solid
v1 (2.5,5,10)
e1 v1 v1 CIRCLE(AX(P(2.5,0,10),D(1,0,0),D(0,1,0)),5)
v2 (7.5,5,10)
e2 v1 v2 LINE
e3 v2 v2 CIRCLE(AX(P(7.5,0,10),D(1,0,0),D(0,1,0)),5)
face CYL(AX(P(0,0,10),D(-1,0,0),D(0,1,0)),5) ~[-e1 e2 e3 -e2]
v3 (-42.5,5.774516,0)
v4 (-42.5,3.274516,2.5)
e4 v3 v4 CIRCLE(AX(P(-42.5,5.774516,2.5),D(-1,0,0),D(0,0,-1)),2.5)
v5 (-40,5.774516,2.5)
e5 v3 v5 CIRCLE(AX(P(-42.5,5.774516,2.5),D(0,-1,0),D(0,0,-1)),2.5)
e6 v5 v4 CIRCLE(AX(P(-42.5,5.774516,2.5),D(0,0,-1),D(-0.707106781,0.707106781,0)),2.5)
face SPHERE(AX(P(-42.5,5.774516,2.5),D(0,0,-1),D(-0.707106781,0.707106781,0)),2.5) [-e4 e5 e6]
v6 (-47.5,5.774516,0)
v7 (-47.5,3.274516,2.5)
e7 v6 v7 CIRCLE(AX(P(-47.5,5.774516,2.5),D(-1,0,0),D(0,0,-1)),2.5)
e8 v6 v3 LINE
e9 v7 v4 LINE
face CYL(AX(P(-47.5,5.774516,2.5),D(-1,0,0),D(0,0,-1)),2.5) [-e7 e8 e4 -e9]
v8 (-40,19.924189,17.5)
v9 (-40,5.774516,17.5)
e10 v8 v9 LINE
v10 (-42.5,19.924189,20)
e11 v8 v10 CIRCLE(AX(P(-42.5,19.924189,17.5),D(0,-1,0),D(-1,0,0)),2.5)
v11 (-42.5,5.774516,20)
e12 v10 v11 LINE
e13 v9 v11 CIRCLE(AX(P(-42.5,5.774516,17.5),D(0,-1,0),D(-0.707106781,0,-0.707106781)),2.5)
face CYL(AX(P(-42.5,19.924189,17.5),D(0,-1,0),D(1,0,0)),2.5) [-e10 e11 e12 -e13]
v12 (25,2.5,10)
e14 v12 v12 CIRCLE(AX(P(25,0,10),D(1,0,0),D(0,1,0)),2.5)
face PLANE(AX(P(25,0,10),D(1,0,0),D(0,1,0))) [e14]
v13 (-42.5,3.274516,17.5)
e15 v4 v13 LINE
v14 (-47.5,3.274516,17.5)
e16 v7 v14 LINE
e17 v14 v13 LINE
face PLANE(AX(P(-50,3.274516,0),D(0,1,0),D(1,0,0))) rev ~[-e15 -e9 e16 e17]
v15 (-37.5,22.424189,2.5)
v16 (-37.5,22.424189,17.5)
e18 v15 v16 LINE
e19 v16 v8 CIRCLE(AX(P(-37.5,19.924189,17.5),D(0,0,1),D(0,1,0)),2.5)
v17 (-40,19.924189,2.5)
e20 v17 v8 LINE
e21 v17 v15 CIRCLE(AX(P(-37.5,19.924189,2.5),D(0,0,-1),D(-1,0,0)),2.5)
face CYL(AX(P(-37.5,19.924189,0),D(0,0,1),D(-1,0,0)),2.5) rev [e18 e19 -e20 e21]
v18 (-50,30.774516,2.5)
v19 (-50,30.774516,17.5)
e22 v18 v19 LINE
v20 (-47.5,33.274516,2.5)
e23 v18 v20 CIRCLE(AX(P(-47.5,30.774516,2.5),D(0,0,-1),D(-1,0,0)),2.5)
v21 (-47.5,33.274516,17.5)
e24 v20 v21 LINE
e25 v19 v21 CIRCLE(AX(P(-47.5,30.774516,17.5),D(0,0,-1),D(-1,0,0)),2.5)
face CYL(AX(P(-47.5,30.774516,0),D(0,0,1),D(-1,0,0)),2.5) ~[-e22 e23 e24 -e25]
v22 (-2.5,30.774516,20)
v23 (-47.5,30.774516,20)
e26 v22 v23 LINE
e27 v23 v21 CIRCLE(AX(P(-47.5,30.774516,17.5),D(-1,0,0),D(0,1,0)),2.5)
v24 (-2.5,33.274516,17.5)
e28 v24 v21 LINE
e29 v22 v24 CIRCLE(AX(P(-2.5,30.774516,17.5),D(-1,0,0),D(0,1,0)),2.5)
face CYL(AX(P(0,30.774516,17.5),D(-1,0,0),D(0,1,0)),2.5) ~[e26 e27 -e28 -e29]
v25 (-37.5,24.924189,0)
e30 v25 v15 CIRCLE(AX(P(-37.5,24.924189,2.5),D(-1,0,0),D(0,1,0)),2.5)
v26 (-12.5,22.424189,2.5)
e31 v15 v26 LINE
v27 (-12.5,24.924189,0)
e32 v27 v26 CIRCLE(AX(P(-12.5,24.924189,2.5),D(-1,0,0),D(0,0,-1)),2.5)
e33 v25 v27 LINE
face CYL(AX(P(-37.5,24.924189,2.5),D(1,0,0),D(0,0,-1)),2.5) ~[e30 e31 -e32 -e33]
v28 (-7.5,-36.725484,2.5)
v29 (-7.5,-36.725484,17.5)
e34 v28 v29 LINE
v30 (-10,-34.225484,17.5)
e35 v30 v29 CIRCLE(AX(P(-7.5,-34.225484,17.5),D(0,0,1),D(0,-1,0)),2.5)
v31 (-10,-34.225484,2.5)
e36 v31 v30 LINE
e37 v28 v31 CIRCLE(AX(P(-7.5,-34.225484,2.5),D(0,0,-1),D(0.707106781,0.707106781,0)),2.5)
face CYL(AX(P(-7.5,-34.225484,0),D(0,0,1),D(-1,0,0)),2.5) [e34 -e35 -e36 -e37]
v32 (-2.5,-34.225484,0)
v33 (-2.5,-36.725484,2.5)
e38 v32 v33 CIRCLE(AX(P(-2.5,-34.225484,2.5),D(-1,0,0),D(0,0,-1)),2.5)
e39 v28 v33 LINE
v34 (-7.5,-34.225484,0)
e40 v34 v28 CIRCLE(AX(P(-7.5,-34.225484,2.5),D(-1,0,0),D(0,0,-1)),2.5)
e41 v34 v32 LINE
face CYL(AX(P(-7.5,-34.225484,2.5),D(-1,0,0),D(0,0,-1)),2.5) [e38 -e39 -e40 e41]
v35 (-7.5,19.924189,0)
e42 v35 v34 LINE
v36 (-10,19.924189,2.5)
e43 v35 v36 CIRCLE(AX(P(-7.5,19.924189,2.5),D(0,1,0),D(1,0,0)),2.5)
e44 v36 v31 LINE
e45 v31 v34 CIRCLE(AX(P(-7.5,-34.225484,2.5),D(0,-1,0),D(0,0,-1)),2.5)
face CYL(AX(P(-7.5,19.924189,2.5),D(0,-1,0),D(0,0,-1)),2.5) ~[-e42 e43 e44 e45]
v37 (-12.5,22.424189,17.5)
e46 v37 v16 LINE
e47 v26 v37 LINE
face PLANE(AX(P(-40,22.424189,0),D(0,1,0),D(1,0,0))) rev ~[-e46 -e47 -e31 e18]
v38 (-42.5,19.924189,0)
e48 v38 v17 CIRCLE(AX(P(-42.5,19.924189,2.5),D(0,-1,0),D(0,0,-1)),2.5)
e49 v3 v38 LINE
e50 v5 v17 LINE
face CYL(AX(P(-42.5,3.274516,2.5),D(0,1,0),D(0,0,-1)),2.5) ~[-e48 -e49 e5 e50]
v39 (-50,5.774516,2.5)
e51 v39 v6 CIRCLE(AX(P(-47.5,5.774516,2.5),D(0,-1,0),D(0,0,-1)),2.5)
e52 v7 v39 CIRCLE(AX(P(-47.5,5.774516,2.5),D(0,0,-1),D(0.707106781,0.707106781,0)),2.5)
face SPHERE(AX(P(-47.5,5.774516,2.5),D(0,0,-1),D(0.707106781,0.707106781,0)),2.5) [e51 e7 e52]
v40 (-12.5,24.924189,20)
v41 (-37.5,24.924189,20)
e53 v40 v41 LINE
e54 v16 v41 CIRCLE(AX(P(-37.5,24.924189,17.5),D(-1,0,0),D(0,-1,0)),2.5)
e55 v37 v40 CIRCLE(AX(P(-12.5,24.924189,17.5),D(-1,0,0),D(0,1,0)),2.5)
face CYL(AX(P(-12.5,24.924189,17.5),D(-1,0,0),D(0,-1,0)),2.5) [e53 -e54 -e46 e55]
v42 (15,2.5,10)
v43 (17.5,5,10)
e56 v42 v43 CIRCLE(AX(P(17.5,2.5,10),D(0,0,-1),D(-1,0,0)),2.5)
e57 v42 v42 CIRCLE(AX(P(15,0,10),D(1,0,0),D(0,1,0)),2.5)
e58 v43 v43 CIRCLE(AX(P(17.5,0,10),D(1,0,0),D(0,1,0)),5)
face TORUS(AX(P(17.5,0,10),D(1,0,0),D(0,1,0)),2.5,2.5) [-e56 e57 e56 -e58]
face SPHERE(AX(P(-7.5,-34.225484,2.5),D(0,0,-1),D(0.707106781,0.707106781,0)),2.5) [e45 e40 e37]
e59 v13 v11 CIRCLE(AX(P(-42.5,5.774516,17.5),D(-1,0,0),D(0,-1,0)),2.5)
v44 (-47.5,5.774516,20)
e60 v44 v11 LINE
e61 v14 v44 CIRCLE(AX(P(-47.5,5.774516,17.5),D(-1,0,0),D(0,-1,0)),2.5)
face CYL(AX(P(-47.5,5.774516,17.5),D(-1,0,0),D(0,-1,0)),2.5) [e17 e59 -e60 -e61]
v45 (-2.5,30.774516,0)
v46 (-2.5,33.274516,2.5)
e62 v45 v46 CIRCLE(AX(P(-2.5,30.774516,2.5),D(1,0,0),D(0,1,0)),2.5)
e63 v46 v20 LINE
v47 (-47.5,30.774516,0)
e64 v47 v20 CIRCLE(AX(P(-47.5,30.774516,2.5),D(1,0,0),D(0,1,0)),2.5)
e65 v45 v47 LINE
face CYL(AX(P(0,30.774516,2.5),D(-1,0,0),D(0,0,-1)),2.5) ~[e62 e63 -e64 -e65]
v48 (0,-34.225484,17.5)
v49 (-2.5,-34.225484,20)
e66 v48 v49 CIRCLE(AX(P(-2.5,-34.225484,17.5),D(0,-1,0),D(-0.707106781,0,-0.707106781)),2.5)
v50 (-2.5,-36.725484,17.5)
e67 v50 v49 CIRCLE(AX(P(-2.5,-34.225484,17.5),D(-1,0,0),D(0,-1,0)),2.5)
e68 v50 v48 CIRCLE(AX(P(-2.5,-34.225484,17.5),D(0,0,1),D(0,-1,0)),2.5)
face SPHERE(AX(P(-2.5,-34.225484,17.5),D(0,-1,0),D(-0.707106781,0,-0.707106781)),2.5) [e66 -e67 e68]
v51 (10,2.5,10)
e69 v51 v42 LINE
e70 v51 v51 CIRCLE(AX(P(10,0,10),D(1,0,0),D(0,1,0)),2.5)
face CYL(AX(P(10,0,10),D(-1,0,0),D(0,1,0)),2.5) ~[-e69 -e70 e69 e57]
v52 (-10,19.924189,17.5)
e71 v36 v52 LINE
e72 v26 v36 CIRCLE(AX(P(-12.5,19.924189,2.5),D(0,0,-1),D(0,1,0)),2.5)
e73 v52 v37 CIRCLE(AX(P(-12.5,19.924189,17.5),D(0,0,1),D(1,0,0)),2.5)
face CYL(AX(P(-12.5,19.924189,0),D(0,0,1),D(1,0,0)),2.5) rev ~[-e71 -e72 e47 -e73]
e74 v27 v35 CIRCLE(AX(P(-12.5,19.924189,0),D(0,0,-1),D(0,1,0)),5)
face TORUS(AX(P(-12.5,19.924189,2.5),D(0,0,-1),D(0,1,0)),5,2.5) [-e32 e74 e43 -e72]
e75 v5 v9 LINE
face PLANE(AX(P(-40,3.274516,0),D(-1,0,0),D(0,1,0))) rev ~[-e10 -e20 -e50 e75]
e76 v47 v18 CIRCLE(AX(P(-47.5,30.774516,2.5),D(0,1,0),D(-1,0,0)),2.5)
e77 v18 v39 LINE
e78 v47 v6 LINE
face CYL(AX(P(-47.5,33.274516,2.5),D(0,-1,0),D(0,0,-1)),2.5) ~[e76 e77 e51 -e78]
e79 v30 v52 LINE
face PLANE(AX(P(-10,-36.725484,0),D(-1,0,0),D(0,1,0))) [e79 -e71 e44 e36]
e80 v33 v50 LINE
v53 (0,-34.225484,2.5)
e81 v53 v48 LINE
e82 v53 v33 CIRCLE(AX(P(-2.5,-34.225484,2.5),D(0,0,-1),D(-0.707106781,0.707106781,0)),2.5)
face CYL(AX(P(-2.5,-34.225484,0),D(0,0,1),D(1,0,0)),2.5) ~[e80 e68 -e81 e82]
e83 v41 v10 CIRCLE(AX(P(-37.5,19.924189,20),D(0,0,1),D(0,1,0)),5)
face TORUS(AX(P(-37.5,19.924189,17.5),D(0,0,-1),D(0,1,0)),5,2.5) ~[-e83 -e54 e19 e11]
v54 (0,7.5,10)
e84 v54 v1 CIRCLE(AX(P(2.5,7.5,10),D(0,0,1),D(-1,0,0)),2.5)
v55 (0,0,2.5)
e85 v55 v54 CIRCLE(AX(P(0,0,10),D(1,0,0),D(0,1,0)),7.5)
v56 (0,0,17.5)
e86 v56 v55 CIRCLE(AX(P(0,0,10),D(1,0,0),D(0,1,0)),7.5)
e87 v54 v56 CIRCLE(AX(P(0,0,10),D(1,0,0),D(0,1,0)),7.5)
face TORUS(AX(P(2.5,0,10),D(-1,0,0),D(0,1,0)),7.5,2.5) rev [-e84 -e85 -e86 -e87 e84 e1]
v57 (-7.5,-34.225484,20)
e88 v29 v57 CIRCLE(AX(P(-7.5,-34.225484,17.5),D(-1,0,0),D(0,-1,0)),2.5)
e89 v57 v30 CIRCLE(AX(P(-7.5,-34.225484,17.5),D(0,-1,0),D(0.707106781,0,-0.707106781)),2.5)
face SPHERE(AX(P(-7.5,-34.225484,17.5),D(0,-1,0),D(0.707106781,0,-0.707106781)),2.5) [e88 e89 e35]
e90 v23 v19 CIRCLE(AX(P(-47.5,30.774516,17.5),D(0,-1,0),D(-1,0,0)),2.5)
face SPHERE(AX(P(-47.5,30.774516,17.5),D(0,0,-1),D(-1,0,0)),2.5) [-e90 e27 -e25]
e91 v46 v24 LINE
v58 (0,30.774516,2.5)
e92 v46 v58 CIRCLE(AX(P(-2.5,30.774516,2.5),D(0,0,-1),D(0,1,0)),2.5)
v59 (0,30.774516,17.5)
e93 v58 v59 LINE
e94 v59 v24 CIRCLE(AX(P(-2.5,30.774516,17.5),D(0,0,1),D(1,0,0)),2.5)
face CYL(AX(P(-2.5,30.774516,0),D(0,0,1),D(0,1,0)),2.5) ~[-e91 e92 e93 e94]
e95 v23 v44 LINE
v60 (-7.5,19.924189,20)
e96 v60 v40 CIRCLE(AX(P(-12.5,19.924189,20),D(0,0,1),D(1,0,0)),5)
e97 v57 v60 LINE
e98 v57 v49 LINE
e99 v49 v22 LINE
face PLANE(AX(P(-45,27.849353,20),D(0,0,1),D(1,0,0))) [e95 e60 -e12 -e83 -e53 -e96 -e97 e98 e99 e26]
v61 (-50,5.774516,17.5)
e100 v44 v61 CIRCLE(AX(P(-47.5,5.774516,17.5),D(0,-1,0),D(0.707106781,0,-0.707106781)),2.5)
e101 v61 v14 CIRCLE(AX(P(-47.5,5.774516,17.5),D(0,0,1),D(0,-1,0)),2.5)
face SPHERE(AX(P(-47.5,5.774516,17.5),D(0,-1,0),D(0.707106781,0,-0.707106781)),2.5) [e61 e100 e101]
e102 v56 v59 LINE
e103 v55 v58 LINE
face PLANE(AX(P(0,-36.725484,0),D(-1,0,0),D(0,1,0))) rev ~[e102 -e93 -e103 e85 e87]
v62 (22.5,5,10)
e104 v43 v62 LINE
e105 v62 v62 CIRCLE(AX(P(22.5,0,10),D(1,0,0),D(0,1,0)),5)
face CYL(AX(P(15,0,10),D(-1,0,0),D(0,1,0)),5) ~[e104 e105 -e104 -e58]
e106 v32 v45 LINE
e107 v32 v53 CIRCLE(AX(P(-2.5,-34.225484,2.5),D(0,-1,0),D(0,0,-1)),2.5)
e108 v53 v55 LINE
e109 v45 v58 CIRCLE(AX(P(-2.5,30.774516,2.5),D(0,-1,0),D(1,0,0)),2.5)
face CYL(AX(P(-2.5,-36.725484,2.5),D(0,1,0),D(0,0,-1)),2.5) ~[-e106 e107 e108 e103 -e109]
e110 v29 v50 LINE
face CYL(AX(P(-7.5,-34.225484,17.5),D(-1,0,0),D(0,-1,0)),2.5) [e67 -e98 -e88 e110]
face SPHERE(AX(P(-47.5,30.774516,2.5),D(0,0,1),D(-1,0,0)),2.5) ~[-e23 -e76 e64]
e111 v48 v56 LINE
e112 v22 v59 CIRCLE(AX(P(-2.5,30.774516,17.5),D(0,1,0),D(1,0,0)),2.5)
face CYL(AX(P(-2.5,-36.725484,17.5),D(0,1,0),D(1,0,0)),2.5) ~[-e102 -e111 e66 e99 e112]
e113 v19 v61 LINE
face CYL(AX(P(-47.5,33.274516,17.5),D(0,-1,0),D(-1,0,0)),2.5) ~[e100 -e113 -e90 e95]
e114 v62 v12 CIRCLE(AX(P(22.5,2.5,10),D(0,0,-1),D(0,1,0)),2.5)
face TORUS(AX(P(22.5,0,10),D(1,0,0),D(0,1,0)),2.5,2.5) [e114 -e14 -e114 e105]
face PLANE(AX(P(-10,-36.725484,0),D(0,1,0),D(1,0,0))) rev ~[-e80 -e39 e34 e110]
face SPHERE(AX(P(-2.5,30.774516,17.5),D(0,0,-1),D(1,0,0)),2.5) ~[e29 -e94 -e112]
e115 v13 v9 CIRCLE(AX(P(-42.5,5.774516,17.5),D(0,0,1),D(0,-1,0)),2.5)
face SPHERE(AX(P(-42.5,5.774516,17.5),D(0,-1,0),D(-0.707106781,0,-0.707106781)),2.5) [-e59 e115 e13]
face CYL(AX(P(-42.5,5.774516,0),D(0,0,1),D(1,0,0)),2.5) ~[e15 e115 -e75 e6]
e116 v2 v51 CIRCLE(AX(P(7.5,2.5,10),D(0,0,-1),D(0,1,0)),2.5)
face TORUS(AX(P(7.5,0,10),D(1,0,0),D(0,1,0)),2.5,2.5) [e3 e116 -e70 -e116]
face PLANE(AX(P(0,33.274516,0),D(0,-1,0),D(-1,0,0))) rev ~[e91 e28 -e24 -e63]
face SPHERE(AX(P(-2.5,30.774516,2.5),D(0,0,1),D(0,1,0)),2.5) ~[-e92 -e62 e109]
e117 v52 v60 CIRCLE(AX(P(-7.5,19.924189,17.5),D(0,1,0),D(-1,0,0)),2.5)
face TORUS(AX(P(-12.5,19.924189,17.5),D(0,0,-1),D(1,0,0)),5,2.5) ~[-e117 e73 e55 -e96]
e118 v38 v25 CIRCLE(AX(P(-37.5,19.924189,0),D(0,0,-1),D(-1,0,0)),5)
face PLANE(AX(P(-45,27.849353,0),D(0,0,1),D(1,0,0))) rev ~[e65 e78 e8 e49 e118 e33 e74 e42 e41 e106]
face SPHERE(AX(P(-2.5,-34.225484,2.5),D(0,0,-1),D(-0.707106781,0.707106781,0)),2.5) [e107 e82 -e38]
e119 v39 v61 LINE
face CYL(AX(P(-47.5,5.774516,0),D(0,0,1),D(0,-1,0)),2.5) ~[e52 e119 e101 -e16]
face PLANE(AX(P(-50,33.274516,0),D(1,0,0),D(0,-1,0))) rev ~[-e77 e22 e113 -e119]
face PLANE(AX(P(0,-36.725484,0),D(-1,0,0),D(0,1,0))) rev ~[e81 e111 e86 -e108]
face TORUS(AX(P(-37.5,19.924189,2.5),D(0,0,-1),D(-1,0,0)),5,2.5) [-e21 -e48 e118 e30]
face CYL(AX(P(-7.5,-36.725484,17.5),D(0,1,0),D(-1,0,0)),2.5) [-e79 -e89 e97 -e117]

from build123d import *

# Parameters (mm, degrees)
F0_W          = 10
F0_H          = 10.8503269244
F0_W_2        = 30
F0_H_2        = 19.1496730756
F0_H_3        = 59.1496730756
F1_DEPTH      = 20
F2_R          = 5
F3_DEPTH      = 10
F5_R          = 2.5
F6_DEPTH      = 5
F7_R          = 5
F7_R_2        = 2.5
F8_DEPTH      = 10
F9_F1_R       = 2.5
F9_F2_R       = 2.5
F10_T3_DEPTH  = 5
F10_T5_DEPTH  = 5
F10_S9_W      = 2.5
F10_S9_H      = 2.5
F10_T10_DEPTH = 2.5
F10_S15_W     = 2.5
F10_S15_H     = 2.5
F10_T16_DEPTH = 2.5
F10_S21_W     = 2.5
F10_S21_H     = 2.5
F10_T22_DEPTH = 2.5
F10_S27_W     = 2.5
F10_S27_H     = 2.5
F10_T28_DEPTH = 2.5
F10_S33_W     = 2.5
F10_S33_H     = 2.5
F10_T34_DEPTH = 2.5
F10_S39_W     = 2.5
F10_S39_H     = 2.5
F10_T40_DEPTH = 2.5
F11_T1_DEPTH  = 5
F11_S5_W      = 2.5
F11_S5_H      = 2.5
F11_T6_DEPTH  = 2.5
F11_S11_W     = 2.5
F11_S11_H     = 2.5
F11_T12_DEPTH = 2.5


# Not quite as in the source:
# - a fillet or chamfer that OpenCascade refuses, or shapes differently, is made with other operations: its cross-section is extruded or revolved along the edge and cut away or added


with BuildPart() as f1:
    # F0 (on Top) → F1 (new body)
    with BuildSketch(Plane.XY):
        with Locations((-45, 27.8493528361)):
            Rectangle(F0_W, F0_H)
        with Locations((-25, 27.8493528361)):
            Rectangle(F0_W_2, F0_H)
        with Locations((-45, 12.8493528361)):
            Rectangle(F0_W, F0_H_2)
        with Locations((-5, 27.8493528361)):
            Rectangle(F0_W, F0_H)
        with Locations((-5, -7.1506471639)):
            Rectangle(F0_W, F0_H_3)
    extrude(amount=F1_DEPTH)

    # F2 (on face) → F3 (join)
    with BuildSketch(Plane.YZ):
        with Locations((0, 10)):
            Circle(F2_R)
    extrude(amount=F3_DEPTH)

    # F5 (on face) → F6 (join)
    with BuildSketch(Plane.YZ.offset(10)):
        with Locations((0, 10)):
            Circle(F5_R)
    extrude(amount=F6_DEPTH)

    # F7 (on face) → F8 (join)
    with BuildSketch(Plane.YZ.offset(15)):
        with Locations((0, 10)):
            Circle(F7_R)
        with Locations((0, 10)):
            Circle(F7_R_2, mode=Mode.SUBTRACT)
        with Locations((0, 10)):
            Circle(F7_R_2)
    extrude(amount=F8_DEPTH)

    # F9: fillet of radius 2.5 on 16 edges, made by hand

    # F9_f1
    f9_f1_edges = [f1.edges().sort_by_distance(p)[0] for p in [
        (-40, 22.4241893739, 10),
        (-10, 22.4241893739, 10),
    ]]
    fillet(f9_f1_edges, radius=F9_F1_R)

    # F9_f2
    f9_f2_edges = [f1.edges().sort_by_distance(p)[0] for p in [
        (0, 33.2745162983, 10),
        (-50, 33.2745162983, 10),
        (-50, 3.2745162983, 10),
        (-40, 3.2745162983, 10),
        (-10, -36.7254837017, 10),
        (0, -36.7254837017, 10),
        (0, -1.7254837017, 20),
        (-10, -8.4006471639, 20),
        (-25, 22.4241893739, 0),
        (-50, 18.2745162983, 20),
        (-50, 18.2745162983, 0),
        (-25, 33.2745162983, 0),
        (-25, 33.2745162983, 20),
        (0, -1.7254837017, 0),
        (-39.267766953, 21.6919563268, 0),
        (-10.732233047, 21.6919563268, 0),
        (-10.732233047, 21.6919563268, 20),
    ]]
    fillet(f9_f2_edges, radius=F9_F2_R)

    # F10: fillet of radius 2.5 on 7 edges, made by hand

    # F10_s1 → F10_t2 (revolve)
    with BuildSketch(Plane.XY.offset(10)):
        with BuildLine():
            ThreePointArc((0, 7.5), (0.732233047, 5.732233047), (2.5, 5))
            Line((2.5, 5), (0, 5))
            Line((0, 5), (0, 7.5))
        make_face()
    revolve(axis=Axis((0, 0, 10), (1, 0, 0)))

    # F10_s4 → F10_t3 (cut)
    with BuildSketch(Plane.YZ.offset(-47.5)):
        with BuildLine():
            ThreePointArc((5.7745162983, 0), (4.0067493453, 0.732233047), (3.2745162983, 2.5))
            Line((3.2745162983, 2.5), (3.2745162983, 0))
            Line((3.2745162983, 0), (5.7745162983, 0))
        make_face()
    extrude(amount=F10_T3_DEPTH, mode=Mode.SUBTRACT)

    # F10_s6 → F10_t5 (cut)
    with BuildSketch(Plane.YZ.offset(-7.5)):
        with BuildLine():
            ThreePointArc((-34.2254837017, 0), (-35.9932506547, 0.732233047), (-36.7254837017, 2.5))
            Line((-36.7254837017, 2.5), (-36.7254837017, 0))
            Line((-36.7254837017, 0), (-34.2254837017, 0))
        make_face()
        with BuildLine():
            ThreePointArc((-36.7254837017, 17.5), (-35.9932506547, 19.267766953), (-34.2254837017, 20))
            Line((-34.2254837017, 20), (-36.7254837017, 20))
            Line((-36.7254837017, 20), (-36.7254837017, 17.5))
        make_face()
    extrude(amount=F10_T5_DEPTH, mode=Mode.SUBTRACT)


with BuildPart() as f10_tool8:
    # F10_s9 → F10_t10 (new body)
    with BuildSketch(Plane.XZ.offset(34.2254837017)):
        with Locations((-8.75, 18.75)):
            Rectangle(F10_S9_W, F10_S9_H)
    extrude(amount=F10_T10_DEPTH)

    # F10_s11 → F10_t12 (revolve, cut)
    with BuildSketch(Plane(origin=(-7.5, -34.2254837017, 17.5), x_dir=(0.7071067812, 0, -0.7071067812), z_dir=(-0.7071067812, 0, -0.7071067812))):
        with BuildLine():
            ThreePointArc((0, -2.5), (2.5, 0), (0, 2.5))
            Line((0, 2.5), (0, -2.5))
        make_face()
    revolve(axis=Axis((-7.5, -34.2254837017, 17.5), (0, -1, 0)), mode=Mode.SUBTRACT)


with BuildPart() as f1_1:
    add(f1.part)

    # F10_t7: cut F10_tool8
    add(f10_tool8.part, mode=Mode.SUBTRACT)


with BuildPart() as f10_tool14:
    # F10_s15 → F10_t16 (new body)
    with BuildSketch(Plane.XZ.offset(34.2254837017)):
        with Locations((-1.25, 18.75)):
            Rectangle(F10_S15_W, F10_S15_H)
    extrude(amount=F10_T16_DEPTH)

    # F10_s17 → F10_t18 (revolve, cut)
    with BuildSketch(Plane(origin=(-2.5, -34.2254837017, 17.5), x_dir=(-0.7071067812, 0, -0.7071067812), z_dir=(-0.7071067812, 0, 0.7071067812))):
        with BuildLine():
            ThreePointArc((0, -2.5), (2.5, 0), (0, 2.5))
            Line((0, 2.5), (0, -2.5))
        make_face()
    revolve(axis=Axis((-2.5, -34.2254837017, 17.5), (0, -1, 0)), mode=Mode.SUBTRACT)


with BuildPart() as f1_2:
    add(f1_1.part)

    # F10_t13: cut F10_tool14
    add(f10_tool14.part, mode=Mode.SUBTRACT)


with BuildPart() as f10_tool20:
    # F10_s21 → F10_t22 (new body)
    with BuildSketch(Plane.XY.offset(2.5)):
        with Locations((-8.75, -35.4754837017)):
            Rectangle(F10_S21_W, F10_S21_H)
    extrude(amount=-F10_T22_DEPTH)

    # F10_s23 → F10_t24 (revolve, cut)
    with BuildSketch(Plane(origin=(-7.5, -34.2254837017, 2.5), x_dir=(0.7071067812, 0.7071067812, 0), z_dir=(-0.7071067812, 0.7071067812, 0))):
        with BuildLine():
            ThreePointArc((0, -2.5), (2.5, 0), (0, 2.5))
            Line((0, 2.5), (0, -2.5))
        make_face()
    revolve(axis=Axis((-7.5, -34.2254837017, 2.5), (0, 0, -1)), mode=Mode.SUBTRACT)


with BuildPart() as f1_3:
    add(f1_2.part)

    # F10_t19: cut F10_tool20
    add(f10_tool20.part, mode=Mode.SUBTRACT)


with BuildPart() as f10_tool26:
    # F10_s27 → F10_t28 (new body)
    with BuildSketch(Plane.XY.offset(2.5)):
        with Locations((-1.25, -35.4754837017)):
            Rectangle(F10_S27_W, F10_S27_H)
    extrude(amount=-F10_T28_DEPTH)

    # F10_s29 → F10_t30 (revolve, cut)
    with BuildSketch(Plane(origin=(-2.5, -34.2254837017, 2.5), x_dir=(-0.7071067812, 0.7071067812, 0), z_dir=(-0.7071067812, -0.7071067812, 0))):
        with BuildLine():
            ThreePointArc((0, -2.5), (2.5, 0), (0, 2.5))
            Line((0, 2.5), (0, -2.5))
        make_face()
    revolve(axis=Axis((-2.5, -34.2254837017, 2.5), (0, 0, -1)), mode=Mode.SUBTRACT)


with BuildPart() as f1_4:
    add(f1_3.part)

    # F10_t25: cut F10_tool26
    add(f10_tool26.part, mode=Mode.SUBTRACT)


with BuildPart() as f10_tool32:
    # F10_s33 → F10_t34 (new body)
    with BuildSketch(Plane.XY.offset(2.5)):
        with Locations((-48.75, 4.5245162983)):
            Rectangle(F10_S33_W, F10_S33_H)
    extrude(amount=-F10_T34_DEPTH)

    # F10_s35 → F10_t36 (revolve, cut)
    with BuildSketch(Plane(origin=(-47.5, 5.7745162983, 2.5), x_dir=(0.7071067812, 0.7071067812, 0), z_dir=(-0.7071067812, 0.7071067812, 0))):
        with BuildLine():
            ThreePointArc((0, -2.5), (2.5, 0), (0, 2.5))
            Line((0, 2.5), (0, -2.5))
        make_face()
    revolve(axis=Axis((-47.5, 5.7745162983, 2.5), (0, 0, -1)), mode=Mode.SUBTRACT)


with BuildPart() as f1_5:
    add(f1_4.part)

    # F10_t31: cut F10_tool32
    add(f10_tool32.part, mode=Mode.SUBTRACT)


with BuildPart() as f10_tool38:
    # F10_s39 → F10_t40 (new body)
    with BuildSketch(Plane.XY.offset(2.5)):
        with Locations((-41.25, 4.5245162983)):
            Rectangle(F10_S39_W, F10_S39_H)
    extrude(amount=-F10_T40_DEPTH)

    # F10_s41 → F10_t42 (revolve, cut)
    with BuildSketch(Plane(origin=(-42.5, 5.7745162983, 2.5), x_dir=(-0.7071067812, 0.7071067812, 0), z_dir=(-0.7071067812, -0.7071067812, 0))):
        with BuildLine():
            ThreePointArc((0, -2.5), (2.5, 0), (0, 2.5))
            Line((0, 2.5), (0, -2.5))
        make_face()
    revolve(axis=Axis((-42.5, 5.7745162983, 2.5), (0, 0, -1)), mode=Mode.SUBTRACT)


with BuildPart() as f1_6:
    add(f1_5.part)

    # F10_t37: cut F10_tool38
    add(f10_tool38.part, mode=Mode.SUBTRACT)

    # F10_s43 → F10_t44 (revolve, cut)
    with BuildSketch(Plane.XY.offset(10)):
        with BuildLine():
            ThreePointArc((22.5, 5), (24.267766953, 4.267766953), (25, 2.5))
            Line((25, 2.5), (25, 5))
            Line((25, 5), (22.5, 5))
        make_face()
    revolve(axis=Axis((25, 0, 10), (1, 0, 0)), mode=Mode.SUBTRACT)

    # F10_s45 → F10_t46 (revolve, cut)
    with BuildSketch(Plane.XY.offset(10)):
        with BuildLine():
            ThreePointArc((7.5, 5), (9.267766953, 4.267766953), (10, 2.5))
            Line((10, 2.5), (10, 5))
            Line((10, 5), (7.5, 5))
        make_face()
    revolve(axis=Axis((10, 0, 10), (1, 0, 0)), mode=Mode.SUBTRACT)

    # F10_s47 → F10_t48 (revolve, cut)
    with BuildSketch(Plane.XY.offset(10)):
        with BuildLine():
            ThreePointArc((15, 2.5), (15.732233047, 4.267766953), (17.5, 5))
            Line((17.5, 5), (15, 5))
            Line((15, 5), (15, 2.5))
        make_face()
    revolve(axis=Axis((15, 0, 10), (1, 0, 0)), mode=Mode.SUBTRACT)

    # F11: fillet of radius 2.5 on 1 edges, made by hand

    # F11_s2 → F11_t1 (cut)
    with BuildSketch(Plane.YZ.offset(-47.5)):
        with BuildLine():
            ThreePointArc((3.2745162983, 17.5), (4.0067493453, 19.267766953), (5.7745162983, 20))
            Line((5.7745162983, 20), (3.2745162983, 20))
            Line((3.2745162983, 20), (3.2745162983, 17.5))
        make_face()
    extrude(amount=F11_T1_DEPTH, mode=Mode.SUBTRACT)


with BuildPart() as f11_tool4:
    # F11_s5 → F11_t6 (new body)
    with BuildSketch(Plane.XZ.offset(-5.7745162983)):
        with Locations((-48.75, 18.75)):
            Rectangle(F11_S5_W, F11_S5_H)
    extrude(amount=F11_T6_DEPTH)

    # F11_s7 → F11_t8 (revolve, cut)
    with BuildSketch(Plane(origin=(-47.5, 5.7745162983, 17.5), x_dir=(0.7071067812, 0, -0.7071067812), z_dir=(-0.7071067812, 0, -0.7071067812))):
        with BuildLine():
            ThreePointArc((0, -2.5), (2.5, 0), (0, 2.5))
            Line((0, 2.5), (0, -2.5))
        make_face()
    revolve(axis=Axis((-47.5, 5.7745162983, 17.5), (0, -1, 0)), mode=Mode.SUBTRACT)


with BuildPart() as f1_7:
    add(f1_6.part)

    # F11_t3: cut F11_tool4
    add(f11_tool4.part, mode=Mode.SUBTRACT)


with BuildPart() as f11_tool10:
    # F11_s11 → F11_t12 (new body)
    with BuildSketch(Plane.XZ.offset(-5.7745162983)):
        with Locations((-41.25, 18.75)):
            Rectangle(F11_S11_W, F11_S11_H)
    extrude(amount=F11_T12_DEPTH)

    # F11_s13 → F11_t14 (revolve, cut)
    with BuildSketch(Plane(origin=(-42.5, 5.7745162983, 17.5), x_dir=(-0.7071067812, 0, -0.7071067812), z_dir=(-0.7071067812, 0, 0.7071067812))):
        with BuildLine():
            ThreePointArc((0, -2.5), (2.5, 0), (0, 2.5))
            Line((0, 2.5), (0, -2.5))
        make_face()
    revolve(axis=Axis((-42.5, 5.7745162983, 17.5), (0, -1, 0)), mode=Mode.SUBTRACT)


with BuildPart() as f1_8:
    add(f1_7.part)

    # F11_t9: cut F11_tool10
    add(f11_tool10.part, mode=Mode.SUBTRACT)


solid = f1_8.part
